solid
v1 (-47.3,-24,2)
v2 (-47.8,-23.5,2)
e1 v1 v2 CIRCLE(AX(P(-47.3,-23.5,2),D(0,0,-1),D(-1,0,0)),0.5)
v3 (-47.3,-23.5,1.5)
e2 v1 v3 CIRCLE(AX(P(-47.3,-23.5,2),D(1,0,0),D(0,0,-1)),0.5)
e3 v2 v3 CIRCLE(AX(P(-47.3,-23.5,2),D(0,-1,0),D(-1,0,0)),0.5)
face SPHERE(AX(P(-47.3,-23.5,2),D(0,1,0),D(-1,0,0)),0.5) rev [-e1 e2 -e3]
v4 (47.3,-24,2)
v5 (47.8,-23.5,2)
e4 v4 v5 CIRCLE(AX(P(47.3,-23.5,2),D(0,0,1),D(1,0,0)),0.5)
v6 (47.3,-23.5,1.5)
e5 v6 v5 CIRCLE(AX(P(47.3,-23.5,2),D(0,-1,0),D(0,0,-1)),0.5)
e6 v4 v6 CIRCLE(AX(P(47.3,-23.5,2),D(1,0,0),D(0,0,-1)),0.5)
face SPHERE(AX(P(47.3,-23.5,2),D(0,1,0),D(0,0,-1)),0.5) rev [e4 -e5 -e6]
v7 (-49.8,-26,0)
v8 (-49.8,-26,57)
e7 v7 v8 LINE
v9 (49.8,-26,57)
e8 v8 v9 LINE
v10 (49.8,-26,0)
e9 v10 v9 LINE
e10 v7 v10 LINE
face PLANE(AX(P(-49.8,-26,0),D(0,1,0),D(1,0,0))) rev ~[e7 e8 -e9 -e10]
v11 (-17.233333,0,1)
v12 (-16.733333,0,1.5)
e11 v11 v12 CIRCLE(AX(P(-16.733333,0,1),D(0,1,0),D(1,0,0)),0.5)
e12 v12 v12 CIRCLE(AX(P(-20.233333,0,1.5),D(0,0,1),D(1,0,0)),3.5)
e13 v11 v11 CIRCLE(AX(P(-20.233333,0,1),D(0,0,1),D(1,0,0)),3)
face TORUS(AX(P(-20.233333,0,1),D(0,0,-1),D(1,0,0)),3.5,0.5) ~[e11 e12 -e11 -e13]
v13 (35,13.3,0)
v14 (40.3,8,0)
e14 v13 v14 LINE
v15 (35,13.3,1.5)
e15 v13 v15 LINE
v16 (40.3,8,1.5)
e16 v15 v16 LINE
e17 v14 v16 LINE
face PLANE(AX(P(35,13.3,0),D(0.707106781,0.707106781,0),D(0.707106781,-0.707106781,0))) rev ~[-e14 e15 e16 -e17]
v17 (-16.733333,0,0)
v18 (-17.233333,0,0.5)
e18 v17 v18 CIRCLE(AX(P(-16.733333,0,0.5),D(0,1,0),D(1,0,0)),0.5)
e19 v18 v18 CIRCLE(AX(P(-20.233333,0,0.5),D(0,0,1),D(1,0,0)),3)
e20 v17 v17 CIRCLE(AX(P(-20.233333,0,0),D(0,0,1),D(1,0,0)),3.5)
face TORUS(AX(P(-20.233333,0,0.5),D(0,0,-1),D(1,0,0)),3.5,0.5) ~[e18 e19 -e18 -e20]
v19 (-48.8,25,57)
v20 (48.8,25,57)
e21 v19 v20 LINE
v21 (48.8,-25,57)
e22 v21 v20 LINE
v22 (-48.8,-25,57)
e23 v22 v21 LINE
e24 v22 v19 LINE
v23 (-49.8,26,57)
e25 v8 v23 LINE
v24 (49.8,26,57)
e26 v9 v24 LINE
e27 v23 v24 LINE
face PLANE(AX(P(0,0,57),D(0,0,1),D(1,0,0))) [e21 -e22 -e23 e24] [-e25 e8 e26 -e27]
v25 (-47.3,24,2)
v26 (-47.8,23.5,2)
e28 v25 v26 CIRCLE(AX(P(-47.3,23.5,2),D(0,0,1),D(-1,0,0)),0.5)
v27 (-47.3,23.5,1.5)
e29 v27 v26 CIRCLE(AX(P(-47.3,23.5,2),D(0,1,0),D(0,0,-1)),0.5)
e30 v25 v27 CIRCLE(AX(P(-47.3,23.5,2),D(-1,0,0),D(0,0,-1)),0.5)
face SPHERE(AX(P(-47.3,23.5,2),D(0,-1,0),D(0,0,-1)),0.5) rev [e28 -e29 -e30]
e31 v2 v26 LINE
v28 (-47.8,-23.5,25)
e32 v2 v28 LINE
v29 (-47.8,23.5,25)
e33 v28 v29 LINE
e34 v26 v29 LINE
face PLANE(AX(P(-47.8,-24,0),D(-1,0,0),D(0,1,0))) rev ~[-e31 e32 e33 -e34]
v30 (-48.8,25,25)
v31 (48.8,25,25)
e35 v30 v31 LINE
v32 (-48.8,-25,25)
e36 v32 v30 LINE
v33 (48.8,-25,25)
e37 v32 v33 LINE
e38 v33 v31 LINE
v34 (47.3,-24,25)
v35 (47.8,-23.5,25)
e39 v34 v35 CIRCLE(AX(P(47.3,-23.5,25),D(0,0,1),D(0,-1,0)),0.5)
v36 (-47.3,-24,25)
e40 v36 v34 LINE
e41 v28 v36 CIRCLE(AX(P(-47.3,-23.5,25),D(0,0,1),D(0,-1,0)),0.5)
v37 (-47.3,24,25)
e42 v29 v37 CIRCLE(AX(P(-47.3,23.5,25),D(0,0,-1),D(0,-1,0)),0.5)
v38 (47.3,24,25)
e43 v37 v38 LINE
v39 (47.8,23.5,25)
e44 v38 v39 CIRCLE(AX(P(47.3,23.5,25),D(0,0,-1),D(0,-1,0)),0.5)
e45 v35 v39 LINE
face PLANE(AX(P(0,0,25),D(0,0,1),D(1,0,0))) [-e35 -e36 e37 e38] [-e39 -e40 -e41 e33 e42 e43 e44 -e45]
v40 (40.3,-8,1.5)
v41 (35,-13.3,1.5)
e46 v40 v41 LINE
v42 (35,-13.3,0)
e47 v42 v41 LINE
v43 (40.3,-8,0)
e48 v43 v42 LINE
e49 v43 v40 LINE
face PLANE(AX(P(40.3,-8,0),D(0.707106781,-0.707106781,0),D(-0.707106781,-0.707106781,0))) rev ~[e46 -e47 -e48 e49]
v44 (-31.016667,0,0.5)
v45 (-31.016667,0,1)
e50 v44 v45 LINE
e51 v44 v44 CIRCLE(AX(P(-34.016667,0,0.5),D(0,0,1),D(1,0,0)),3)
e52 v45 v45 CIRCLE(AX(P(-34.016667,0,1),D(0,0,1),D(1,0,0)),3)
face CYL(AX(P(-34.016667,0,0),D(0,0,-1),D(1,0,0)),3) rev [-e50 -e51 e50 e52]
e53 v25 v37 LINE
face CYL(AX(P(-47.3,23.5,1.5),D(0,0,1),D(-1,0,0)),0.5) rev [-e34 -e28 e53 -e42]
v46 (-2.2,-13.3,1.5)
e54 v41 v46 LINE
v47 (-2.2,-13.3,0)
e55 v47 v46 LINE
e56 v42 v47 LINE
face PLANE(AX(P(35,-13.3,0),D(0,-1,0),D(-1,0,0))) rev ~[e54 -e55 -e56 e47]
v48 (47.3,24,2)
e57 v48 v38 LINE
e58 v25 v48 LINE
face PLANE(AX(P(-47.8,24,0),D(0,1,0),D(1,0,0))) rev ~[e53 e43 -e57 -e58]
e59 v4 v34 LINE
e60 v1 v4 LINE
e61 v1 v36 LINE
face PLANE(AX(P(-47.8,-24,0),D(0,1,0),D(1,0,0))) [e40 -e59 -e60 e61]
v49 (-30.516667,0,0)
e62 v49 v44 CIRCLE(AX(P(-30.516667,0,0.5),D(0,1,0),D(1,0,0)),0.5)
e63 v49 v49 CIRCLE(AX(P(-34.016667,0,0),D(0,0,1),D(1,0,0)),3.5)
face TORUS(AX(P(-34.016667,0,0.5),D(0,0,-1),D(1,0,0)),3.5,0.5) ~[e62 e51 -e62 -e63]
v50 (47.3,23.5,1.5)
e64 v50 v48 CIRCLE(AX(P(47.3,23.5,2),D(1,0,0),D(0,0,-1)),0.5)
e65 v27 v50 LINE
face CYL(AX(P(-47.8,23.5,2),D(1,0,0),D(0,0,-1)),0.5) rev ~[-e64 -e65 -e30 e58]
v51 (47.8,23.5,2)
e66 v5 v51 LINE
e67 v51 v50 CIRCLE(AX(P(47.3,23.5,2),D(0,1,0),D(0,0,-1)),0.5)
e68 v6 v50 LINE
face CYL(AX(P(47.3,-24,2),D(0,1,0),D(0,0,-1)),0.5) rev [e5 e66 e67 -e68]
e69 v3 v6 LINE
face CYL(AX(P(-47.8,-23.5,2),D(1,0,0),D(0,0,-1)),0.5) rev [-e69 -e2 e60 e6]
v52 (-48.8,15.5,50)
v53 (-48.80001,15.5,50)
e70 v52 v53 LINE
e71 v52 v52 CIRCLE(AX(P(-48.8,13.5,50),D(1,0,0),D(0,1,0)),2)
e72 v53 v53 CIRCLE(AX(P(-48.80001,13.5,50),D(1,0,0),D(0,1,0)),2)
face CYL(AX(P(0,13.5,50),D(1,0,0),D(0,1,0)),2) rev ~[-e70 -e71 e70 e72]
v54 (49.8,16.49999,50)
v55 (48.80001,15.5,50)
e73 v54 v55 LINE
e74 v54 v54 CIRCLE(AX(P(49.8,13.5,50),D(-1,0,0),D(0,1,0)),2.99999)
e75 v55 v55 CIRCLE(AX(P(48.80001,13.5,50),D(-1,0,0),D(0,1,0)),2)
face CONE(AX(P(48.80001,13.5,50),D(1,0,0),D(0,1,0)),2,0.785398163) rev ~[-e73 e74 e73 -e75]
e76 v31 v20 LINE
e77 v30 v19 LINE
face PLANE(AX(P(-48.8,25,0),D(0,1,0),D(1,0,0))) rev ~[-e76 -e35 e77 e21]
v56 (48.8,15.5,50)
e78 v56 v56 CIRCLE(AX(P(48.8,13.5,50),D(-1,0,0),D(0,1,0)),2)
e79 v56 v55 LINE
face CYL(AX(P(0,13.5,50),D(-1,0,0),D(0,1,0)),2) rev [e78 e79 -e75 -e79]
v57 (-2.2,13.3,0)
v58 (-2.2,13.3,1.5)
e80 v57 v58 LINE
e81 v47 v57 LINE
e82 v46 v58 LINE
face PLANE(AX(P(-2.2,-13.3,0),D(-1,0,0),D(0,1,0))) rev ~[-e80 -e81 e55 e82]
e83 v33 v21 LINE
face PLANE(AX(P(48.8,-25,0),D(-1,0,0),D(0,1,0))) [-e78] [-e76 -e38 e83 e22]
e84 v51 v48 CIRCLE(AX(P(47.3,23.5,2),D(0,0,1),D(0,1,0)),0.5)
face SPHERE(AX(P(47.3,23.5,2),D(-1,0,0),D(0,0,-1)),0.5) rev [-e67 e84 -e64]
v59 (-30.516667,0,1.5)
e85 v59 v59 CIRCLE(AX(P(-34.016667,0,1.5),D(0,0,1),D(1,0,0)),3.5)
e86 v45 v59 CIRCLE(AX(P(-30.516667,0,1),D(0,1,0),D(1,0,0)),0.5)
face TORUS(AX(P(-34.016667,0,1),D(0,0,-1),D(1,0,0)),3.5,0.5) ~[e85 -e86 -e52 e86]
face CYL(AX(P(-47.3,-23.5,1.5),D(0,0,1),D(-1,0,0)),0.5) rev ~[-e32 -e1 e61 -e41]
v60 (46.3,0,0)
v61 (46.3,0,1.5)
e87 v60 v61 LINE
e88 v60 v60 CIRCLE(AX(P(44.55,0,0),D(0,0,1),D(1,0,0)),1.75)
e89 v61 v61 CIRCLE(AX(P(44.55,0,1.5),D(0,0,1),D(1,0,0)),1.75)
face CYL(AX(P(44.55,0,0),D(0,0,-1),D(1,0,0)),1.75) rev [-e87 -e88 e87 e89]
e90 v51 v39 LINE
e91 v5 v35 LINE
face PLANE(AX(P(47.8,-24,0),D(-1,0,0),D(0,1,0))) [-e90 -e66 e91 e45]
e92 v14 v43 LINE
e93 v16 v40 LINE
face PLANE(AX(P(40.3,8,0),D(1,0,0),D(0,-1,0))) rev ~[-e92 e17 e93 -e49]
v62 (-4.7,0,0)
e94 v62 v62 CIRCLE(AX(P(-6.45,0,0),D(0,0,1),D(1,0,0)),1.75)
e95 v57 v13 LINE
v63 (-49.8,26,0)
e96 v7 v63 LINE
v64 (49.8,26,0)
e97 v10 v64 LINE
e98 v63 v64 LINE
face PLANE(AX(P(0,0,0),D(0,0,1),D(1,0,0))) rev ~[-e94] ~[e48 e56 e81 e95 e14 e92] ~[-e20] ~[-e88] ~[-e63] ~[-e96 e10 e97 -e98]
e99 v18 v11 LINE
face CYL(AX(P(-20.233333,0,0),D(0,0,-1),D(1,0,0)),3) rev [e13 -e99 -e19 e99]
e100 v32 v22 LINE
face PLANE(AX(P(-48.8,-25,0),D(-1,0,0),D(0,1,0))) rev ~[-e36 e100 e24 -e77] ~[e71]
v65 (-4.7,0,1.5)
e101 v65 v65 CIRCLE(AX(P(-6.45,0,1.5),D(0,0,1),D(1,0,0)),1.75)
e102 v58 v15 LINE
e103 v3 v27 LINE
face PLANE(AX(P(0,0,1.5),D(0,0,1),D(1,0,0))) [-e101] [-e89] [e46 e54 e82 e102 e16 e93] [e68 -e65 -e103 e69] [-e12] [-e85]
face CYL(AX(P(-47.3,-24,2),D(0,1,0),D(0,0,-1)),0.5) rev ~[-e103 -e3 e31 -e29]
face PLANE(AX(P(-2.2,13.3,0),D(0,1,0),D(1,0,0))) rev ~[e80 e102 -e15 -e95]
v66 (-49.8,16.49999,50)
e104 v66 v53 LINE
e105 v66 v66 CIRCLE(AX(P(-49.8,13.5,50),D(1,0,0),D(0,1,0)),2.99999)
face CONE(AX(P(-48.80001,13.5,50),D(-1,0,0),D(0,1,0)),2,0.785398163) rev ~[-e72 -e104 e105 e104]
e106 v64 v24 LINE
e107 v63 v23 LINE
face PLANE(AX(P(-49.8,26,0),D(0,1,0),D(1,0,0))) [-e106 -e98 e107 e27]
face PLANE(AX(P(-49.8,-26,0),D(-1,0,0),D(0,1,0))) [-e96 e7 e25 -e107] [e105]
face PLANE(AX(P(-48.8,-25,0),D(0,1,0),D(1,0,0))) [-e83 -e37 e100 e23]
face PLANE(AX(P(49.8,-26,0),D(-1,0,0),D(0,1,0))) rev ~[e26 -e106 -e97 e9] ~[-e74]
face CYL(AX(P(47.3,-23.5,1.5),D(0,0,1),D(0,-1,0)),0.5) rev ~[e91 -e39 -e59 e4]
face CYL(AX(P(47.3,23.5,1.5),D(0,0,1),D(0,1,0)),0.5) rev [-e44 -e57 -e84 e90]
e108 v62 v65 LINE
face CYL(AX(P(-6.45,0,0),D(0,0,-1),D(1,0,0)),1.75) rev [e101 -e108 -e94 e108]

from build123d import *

# Parameters (mm, degrees)
F1_W          = 95.6
F1_H          = 48
F1_R          = 3
F1_R_2        = 1.75
F2_DEPTH      = 1.5
F1_W_2        = 97.6
F1_H_2        = 50
F3_DEPTH      = 25
F1_W_3        = 99.6
F1_H_3        = 52
F4_DEPTH      = 57
F5_R          = 2
F6_DEPTH      = 49.801
F6_DEPTH_BACK = 49.801
F7_SIZE       = 0.99999
F8_R          = 0.5


# Not quite as in the source:
# - a fillet or chamfer is up to 0.001 mm smaller than in the source, because OpenCascade refuses the exact size


with BuildPart() as f2:
    # F1 (on Top) → F2 (new body)
    with BuildSketch(Plane.XY):
        Rectangle(F1_W, F1_H)
        with Locations((-34.0166666667, 0)):
            Circle(F1_R, mode=Mode.SUBTRACT)
        with Locations((-20.2333333333, 0)):
            Circle(F1_R, mode=Mode.SUBTRACT)
        with Locations((-6.45, 0)):
            Circle(F1_R_2, mode=Mode.SUBTRACT)
        Polygon((-2.2, -13.3), (-2.2, 13.3), (35, 13.3), (40.3, 8), (40.3, -8), (35, -13.3), align=None, mode=Mode.SUBTRACT)
        with Locations((44.55, 0)):
            Circle(F1_R_2, mode=Mode.SUBTRACT)
    extrude(amount=F2_DEPTH)

    # F1 (on Top) → F3 (join)
    with BuildSketch(Plane.XY):
        Rectangle(F1_W_2, F1_H_2)
        Rectangle(F1_W, F1_H, mode=Mode.SUBTRACT)
    extrude(amount=F3_DEPTH)

    # F1 (on Top) → F4 (join)
    with BuildSketch(Plane.XY):
        Rectangle(F1_W_3, F1_H_3)
        Rectangle(F1_W_2, F1_H_2, mode=Mode.SUBTRACT)
    extrude(amount=F4_DEPTH)

    # F5 (on Right) → F6 (cut, two sides)
    with BuildSketch(Plane.YZ) as f6_sk:
        with Locations((13.5, 50)):
            Circle(F5_R)
    extrude(amount=-F6_DEPTH, mode=Mode.SUBTRACT)
    extrude(f6_sk.sketch, amount=F6_DEPTH_BACK, mode=Mode.SUBTRACT)

    # F7 (size 1 in the source; OpenCascade refuses exactly that, so slightly less here)
    f7_edges = [f2.edges().sort_by_distance(p)[0] for p in [
        (49.8, 11.5, 50),
        (-49.8, 11.5, 50),
    ]]
    chamfer(f7_edges, length=F7_SIZE)

    # F8
    f8_edges = [f2.edges().sort_by_distance(p)[0] for p in [
        (-17.233333, 0, 0.75),
        (-23.233333, 0, 0),
        (-23.233333, 0, 1.5),
        (-31.016667, 0, 0.75),
        (-37.016667, 0, 0),
        (-37.016667, 0, 1.5),
        (-47.8, 0, 1.5),
        (0, 24, 1.5),
        (47.8, 0, 1.5),
        (47.8, 24, 13.25),
        (-47.8, 24, 13.25),
        (-47.8, -24, 13.25),
        (0, -24, 1.5),
        (47.8, -24, 13.25),
    ]]
    fillet(f8_edges, radius=F8_R)


solid = f2.part
